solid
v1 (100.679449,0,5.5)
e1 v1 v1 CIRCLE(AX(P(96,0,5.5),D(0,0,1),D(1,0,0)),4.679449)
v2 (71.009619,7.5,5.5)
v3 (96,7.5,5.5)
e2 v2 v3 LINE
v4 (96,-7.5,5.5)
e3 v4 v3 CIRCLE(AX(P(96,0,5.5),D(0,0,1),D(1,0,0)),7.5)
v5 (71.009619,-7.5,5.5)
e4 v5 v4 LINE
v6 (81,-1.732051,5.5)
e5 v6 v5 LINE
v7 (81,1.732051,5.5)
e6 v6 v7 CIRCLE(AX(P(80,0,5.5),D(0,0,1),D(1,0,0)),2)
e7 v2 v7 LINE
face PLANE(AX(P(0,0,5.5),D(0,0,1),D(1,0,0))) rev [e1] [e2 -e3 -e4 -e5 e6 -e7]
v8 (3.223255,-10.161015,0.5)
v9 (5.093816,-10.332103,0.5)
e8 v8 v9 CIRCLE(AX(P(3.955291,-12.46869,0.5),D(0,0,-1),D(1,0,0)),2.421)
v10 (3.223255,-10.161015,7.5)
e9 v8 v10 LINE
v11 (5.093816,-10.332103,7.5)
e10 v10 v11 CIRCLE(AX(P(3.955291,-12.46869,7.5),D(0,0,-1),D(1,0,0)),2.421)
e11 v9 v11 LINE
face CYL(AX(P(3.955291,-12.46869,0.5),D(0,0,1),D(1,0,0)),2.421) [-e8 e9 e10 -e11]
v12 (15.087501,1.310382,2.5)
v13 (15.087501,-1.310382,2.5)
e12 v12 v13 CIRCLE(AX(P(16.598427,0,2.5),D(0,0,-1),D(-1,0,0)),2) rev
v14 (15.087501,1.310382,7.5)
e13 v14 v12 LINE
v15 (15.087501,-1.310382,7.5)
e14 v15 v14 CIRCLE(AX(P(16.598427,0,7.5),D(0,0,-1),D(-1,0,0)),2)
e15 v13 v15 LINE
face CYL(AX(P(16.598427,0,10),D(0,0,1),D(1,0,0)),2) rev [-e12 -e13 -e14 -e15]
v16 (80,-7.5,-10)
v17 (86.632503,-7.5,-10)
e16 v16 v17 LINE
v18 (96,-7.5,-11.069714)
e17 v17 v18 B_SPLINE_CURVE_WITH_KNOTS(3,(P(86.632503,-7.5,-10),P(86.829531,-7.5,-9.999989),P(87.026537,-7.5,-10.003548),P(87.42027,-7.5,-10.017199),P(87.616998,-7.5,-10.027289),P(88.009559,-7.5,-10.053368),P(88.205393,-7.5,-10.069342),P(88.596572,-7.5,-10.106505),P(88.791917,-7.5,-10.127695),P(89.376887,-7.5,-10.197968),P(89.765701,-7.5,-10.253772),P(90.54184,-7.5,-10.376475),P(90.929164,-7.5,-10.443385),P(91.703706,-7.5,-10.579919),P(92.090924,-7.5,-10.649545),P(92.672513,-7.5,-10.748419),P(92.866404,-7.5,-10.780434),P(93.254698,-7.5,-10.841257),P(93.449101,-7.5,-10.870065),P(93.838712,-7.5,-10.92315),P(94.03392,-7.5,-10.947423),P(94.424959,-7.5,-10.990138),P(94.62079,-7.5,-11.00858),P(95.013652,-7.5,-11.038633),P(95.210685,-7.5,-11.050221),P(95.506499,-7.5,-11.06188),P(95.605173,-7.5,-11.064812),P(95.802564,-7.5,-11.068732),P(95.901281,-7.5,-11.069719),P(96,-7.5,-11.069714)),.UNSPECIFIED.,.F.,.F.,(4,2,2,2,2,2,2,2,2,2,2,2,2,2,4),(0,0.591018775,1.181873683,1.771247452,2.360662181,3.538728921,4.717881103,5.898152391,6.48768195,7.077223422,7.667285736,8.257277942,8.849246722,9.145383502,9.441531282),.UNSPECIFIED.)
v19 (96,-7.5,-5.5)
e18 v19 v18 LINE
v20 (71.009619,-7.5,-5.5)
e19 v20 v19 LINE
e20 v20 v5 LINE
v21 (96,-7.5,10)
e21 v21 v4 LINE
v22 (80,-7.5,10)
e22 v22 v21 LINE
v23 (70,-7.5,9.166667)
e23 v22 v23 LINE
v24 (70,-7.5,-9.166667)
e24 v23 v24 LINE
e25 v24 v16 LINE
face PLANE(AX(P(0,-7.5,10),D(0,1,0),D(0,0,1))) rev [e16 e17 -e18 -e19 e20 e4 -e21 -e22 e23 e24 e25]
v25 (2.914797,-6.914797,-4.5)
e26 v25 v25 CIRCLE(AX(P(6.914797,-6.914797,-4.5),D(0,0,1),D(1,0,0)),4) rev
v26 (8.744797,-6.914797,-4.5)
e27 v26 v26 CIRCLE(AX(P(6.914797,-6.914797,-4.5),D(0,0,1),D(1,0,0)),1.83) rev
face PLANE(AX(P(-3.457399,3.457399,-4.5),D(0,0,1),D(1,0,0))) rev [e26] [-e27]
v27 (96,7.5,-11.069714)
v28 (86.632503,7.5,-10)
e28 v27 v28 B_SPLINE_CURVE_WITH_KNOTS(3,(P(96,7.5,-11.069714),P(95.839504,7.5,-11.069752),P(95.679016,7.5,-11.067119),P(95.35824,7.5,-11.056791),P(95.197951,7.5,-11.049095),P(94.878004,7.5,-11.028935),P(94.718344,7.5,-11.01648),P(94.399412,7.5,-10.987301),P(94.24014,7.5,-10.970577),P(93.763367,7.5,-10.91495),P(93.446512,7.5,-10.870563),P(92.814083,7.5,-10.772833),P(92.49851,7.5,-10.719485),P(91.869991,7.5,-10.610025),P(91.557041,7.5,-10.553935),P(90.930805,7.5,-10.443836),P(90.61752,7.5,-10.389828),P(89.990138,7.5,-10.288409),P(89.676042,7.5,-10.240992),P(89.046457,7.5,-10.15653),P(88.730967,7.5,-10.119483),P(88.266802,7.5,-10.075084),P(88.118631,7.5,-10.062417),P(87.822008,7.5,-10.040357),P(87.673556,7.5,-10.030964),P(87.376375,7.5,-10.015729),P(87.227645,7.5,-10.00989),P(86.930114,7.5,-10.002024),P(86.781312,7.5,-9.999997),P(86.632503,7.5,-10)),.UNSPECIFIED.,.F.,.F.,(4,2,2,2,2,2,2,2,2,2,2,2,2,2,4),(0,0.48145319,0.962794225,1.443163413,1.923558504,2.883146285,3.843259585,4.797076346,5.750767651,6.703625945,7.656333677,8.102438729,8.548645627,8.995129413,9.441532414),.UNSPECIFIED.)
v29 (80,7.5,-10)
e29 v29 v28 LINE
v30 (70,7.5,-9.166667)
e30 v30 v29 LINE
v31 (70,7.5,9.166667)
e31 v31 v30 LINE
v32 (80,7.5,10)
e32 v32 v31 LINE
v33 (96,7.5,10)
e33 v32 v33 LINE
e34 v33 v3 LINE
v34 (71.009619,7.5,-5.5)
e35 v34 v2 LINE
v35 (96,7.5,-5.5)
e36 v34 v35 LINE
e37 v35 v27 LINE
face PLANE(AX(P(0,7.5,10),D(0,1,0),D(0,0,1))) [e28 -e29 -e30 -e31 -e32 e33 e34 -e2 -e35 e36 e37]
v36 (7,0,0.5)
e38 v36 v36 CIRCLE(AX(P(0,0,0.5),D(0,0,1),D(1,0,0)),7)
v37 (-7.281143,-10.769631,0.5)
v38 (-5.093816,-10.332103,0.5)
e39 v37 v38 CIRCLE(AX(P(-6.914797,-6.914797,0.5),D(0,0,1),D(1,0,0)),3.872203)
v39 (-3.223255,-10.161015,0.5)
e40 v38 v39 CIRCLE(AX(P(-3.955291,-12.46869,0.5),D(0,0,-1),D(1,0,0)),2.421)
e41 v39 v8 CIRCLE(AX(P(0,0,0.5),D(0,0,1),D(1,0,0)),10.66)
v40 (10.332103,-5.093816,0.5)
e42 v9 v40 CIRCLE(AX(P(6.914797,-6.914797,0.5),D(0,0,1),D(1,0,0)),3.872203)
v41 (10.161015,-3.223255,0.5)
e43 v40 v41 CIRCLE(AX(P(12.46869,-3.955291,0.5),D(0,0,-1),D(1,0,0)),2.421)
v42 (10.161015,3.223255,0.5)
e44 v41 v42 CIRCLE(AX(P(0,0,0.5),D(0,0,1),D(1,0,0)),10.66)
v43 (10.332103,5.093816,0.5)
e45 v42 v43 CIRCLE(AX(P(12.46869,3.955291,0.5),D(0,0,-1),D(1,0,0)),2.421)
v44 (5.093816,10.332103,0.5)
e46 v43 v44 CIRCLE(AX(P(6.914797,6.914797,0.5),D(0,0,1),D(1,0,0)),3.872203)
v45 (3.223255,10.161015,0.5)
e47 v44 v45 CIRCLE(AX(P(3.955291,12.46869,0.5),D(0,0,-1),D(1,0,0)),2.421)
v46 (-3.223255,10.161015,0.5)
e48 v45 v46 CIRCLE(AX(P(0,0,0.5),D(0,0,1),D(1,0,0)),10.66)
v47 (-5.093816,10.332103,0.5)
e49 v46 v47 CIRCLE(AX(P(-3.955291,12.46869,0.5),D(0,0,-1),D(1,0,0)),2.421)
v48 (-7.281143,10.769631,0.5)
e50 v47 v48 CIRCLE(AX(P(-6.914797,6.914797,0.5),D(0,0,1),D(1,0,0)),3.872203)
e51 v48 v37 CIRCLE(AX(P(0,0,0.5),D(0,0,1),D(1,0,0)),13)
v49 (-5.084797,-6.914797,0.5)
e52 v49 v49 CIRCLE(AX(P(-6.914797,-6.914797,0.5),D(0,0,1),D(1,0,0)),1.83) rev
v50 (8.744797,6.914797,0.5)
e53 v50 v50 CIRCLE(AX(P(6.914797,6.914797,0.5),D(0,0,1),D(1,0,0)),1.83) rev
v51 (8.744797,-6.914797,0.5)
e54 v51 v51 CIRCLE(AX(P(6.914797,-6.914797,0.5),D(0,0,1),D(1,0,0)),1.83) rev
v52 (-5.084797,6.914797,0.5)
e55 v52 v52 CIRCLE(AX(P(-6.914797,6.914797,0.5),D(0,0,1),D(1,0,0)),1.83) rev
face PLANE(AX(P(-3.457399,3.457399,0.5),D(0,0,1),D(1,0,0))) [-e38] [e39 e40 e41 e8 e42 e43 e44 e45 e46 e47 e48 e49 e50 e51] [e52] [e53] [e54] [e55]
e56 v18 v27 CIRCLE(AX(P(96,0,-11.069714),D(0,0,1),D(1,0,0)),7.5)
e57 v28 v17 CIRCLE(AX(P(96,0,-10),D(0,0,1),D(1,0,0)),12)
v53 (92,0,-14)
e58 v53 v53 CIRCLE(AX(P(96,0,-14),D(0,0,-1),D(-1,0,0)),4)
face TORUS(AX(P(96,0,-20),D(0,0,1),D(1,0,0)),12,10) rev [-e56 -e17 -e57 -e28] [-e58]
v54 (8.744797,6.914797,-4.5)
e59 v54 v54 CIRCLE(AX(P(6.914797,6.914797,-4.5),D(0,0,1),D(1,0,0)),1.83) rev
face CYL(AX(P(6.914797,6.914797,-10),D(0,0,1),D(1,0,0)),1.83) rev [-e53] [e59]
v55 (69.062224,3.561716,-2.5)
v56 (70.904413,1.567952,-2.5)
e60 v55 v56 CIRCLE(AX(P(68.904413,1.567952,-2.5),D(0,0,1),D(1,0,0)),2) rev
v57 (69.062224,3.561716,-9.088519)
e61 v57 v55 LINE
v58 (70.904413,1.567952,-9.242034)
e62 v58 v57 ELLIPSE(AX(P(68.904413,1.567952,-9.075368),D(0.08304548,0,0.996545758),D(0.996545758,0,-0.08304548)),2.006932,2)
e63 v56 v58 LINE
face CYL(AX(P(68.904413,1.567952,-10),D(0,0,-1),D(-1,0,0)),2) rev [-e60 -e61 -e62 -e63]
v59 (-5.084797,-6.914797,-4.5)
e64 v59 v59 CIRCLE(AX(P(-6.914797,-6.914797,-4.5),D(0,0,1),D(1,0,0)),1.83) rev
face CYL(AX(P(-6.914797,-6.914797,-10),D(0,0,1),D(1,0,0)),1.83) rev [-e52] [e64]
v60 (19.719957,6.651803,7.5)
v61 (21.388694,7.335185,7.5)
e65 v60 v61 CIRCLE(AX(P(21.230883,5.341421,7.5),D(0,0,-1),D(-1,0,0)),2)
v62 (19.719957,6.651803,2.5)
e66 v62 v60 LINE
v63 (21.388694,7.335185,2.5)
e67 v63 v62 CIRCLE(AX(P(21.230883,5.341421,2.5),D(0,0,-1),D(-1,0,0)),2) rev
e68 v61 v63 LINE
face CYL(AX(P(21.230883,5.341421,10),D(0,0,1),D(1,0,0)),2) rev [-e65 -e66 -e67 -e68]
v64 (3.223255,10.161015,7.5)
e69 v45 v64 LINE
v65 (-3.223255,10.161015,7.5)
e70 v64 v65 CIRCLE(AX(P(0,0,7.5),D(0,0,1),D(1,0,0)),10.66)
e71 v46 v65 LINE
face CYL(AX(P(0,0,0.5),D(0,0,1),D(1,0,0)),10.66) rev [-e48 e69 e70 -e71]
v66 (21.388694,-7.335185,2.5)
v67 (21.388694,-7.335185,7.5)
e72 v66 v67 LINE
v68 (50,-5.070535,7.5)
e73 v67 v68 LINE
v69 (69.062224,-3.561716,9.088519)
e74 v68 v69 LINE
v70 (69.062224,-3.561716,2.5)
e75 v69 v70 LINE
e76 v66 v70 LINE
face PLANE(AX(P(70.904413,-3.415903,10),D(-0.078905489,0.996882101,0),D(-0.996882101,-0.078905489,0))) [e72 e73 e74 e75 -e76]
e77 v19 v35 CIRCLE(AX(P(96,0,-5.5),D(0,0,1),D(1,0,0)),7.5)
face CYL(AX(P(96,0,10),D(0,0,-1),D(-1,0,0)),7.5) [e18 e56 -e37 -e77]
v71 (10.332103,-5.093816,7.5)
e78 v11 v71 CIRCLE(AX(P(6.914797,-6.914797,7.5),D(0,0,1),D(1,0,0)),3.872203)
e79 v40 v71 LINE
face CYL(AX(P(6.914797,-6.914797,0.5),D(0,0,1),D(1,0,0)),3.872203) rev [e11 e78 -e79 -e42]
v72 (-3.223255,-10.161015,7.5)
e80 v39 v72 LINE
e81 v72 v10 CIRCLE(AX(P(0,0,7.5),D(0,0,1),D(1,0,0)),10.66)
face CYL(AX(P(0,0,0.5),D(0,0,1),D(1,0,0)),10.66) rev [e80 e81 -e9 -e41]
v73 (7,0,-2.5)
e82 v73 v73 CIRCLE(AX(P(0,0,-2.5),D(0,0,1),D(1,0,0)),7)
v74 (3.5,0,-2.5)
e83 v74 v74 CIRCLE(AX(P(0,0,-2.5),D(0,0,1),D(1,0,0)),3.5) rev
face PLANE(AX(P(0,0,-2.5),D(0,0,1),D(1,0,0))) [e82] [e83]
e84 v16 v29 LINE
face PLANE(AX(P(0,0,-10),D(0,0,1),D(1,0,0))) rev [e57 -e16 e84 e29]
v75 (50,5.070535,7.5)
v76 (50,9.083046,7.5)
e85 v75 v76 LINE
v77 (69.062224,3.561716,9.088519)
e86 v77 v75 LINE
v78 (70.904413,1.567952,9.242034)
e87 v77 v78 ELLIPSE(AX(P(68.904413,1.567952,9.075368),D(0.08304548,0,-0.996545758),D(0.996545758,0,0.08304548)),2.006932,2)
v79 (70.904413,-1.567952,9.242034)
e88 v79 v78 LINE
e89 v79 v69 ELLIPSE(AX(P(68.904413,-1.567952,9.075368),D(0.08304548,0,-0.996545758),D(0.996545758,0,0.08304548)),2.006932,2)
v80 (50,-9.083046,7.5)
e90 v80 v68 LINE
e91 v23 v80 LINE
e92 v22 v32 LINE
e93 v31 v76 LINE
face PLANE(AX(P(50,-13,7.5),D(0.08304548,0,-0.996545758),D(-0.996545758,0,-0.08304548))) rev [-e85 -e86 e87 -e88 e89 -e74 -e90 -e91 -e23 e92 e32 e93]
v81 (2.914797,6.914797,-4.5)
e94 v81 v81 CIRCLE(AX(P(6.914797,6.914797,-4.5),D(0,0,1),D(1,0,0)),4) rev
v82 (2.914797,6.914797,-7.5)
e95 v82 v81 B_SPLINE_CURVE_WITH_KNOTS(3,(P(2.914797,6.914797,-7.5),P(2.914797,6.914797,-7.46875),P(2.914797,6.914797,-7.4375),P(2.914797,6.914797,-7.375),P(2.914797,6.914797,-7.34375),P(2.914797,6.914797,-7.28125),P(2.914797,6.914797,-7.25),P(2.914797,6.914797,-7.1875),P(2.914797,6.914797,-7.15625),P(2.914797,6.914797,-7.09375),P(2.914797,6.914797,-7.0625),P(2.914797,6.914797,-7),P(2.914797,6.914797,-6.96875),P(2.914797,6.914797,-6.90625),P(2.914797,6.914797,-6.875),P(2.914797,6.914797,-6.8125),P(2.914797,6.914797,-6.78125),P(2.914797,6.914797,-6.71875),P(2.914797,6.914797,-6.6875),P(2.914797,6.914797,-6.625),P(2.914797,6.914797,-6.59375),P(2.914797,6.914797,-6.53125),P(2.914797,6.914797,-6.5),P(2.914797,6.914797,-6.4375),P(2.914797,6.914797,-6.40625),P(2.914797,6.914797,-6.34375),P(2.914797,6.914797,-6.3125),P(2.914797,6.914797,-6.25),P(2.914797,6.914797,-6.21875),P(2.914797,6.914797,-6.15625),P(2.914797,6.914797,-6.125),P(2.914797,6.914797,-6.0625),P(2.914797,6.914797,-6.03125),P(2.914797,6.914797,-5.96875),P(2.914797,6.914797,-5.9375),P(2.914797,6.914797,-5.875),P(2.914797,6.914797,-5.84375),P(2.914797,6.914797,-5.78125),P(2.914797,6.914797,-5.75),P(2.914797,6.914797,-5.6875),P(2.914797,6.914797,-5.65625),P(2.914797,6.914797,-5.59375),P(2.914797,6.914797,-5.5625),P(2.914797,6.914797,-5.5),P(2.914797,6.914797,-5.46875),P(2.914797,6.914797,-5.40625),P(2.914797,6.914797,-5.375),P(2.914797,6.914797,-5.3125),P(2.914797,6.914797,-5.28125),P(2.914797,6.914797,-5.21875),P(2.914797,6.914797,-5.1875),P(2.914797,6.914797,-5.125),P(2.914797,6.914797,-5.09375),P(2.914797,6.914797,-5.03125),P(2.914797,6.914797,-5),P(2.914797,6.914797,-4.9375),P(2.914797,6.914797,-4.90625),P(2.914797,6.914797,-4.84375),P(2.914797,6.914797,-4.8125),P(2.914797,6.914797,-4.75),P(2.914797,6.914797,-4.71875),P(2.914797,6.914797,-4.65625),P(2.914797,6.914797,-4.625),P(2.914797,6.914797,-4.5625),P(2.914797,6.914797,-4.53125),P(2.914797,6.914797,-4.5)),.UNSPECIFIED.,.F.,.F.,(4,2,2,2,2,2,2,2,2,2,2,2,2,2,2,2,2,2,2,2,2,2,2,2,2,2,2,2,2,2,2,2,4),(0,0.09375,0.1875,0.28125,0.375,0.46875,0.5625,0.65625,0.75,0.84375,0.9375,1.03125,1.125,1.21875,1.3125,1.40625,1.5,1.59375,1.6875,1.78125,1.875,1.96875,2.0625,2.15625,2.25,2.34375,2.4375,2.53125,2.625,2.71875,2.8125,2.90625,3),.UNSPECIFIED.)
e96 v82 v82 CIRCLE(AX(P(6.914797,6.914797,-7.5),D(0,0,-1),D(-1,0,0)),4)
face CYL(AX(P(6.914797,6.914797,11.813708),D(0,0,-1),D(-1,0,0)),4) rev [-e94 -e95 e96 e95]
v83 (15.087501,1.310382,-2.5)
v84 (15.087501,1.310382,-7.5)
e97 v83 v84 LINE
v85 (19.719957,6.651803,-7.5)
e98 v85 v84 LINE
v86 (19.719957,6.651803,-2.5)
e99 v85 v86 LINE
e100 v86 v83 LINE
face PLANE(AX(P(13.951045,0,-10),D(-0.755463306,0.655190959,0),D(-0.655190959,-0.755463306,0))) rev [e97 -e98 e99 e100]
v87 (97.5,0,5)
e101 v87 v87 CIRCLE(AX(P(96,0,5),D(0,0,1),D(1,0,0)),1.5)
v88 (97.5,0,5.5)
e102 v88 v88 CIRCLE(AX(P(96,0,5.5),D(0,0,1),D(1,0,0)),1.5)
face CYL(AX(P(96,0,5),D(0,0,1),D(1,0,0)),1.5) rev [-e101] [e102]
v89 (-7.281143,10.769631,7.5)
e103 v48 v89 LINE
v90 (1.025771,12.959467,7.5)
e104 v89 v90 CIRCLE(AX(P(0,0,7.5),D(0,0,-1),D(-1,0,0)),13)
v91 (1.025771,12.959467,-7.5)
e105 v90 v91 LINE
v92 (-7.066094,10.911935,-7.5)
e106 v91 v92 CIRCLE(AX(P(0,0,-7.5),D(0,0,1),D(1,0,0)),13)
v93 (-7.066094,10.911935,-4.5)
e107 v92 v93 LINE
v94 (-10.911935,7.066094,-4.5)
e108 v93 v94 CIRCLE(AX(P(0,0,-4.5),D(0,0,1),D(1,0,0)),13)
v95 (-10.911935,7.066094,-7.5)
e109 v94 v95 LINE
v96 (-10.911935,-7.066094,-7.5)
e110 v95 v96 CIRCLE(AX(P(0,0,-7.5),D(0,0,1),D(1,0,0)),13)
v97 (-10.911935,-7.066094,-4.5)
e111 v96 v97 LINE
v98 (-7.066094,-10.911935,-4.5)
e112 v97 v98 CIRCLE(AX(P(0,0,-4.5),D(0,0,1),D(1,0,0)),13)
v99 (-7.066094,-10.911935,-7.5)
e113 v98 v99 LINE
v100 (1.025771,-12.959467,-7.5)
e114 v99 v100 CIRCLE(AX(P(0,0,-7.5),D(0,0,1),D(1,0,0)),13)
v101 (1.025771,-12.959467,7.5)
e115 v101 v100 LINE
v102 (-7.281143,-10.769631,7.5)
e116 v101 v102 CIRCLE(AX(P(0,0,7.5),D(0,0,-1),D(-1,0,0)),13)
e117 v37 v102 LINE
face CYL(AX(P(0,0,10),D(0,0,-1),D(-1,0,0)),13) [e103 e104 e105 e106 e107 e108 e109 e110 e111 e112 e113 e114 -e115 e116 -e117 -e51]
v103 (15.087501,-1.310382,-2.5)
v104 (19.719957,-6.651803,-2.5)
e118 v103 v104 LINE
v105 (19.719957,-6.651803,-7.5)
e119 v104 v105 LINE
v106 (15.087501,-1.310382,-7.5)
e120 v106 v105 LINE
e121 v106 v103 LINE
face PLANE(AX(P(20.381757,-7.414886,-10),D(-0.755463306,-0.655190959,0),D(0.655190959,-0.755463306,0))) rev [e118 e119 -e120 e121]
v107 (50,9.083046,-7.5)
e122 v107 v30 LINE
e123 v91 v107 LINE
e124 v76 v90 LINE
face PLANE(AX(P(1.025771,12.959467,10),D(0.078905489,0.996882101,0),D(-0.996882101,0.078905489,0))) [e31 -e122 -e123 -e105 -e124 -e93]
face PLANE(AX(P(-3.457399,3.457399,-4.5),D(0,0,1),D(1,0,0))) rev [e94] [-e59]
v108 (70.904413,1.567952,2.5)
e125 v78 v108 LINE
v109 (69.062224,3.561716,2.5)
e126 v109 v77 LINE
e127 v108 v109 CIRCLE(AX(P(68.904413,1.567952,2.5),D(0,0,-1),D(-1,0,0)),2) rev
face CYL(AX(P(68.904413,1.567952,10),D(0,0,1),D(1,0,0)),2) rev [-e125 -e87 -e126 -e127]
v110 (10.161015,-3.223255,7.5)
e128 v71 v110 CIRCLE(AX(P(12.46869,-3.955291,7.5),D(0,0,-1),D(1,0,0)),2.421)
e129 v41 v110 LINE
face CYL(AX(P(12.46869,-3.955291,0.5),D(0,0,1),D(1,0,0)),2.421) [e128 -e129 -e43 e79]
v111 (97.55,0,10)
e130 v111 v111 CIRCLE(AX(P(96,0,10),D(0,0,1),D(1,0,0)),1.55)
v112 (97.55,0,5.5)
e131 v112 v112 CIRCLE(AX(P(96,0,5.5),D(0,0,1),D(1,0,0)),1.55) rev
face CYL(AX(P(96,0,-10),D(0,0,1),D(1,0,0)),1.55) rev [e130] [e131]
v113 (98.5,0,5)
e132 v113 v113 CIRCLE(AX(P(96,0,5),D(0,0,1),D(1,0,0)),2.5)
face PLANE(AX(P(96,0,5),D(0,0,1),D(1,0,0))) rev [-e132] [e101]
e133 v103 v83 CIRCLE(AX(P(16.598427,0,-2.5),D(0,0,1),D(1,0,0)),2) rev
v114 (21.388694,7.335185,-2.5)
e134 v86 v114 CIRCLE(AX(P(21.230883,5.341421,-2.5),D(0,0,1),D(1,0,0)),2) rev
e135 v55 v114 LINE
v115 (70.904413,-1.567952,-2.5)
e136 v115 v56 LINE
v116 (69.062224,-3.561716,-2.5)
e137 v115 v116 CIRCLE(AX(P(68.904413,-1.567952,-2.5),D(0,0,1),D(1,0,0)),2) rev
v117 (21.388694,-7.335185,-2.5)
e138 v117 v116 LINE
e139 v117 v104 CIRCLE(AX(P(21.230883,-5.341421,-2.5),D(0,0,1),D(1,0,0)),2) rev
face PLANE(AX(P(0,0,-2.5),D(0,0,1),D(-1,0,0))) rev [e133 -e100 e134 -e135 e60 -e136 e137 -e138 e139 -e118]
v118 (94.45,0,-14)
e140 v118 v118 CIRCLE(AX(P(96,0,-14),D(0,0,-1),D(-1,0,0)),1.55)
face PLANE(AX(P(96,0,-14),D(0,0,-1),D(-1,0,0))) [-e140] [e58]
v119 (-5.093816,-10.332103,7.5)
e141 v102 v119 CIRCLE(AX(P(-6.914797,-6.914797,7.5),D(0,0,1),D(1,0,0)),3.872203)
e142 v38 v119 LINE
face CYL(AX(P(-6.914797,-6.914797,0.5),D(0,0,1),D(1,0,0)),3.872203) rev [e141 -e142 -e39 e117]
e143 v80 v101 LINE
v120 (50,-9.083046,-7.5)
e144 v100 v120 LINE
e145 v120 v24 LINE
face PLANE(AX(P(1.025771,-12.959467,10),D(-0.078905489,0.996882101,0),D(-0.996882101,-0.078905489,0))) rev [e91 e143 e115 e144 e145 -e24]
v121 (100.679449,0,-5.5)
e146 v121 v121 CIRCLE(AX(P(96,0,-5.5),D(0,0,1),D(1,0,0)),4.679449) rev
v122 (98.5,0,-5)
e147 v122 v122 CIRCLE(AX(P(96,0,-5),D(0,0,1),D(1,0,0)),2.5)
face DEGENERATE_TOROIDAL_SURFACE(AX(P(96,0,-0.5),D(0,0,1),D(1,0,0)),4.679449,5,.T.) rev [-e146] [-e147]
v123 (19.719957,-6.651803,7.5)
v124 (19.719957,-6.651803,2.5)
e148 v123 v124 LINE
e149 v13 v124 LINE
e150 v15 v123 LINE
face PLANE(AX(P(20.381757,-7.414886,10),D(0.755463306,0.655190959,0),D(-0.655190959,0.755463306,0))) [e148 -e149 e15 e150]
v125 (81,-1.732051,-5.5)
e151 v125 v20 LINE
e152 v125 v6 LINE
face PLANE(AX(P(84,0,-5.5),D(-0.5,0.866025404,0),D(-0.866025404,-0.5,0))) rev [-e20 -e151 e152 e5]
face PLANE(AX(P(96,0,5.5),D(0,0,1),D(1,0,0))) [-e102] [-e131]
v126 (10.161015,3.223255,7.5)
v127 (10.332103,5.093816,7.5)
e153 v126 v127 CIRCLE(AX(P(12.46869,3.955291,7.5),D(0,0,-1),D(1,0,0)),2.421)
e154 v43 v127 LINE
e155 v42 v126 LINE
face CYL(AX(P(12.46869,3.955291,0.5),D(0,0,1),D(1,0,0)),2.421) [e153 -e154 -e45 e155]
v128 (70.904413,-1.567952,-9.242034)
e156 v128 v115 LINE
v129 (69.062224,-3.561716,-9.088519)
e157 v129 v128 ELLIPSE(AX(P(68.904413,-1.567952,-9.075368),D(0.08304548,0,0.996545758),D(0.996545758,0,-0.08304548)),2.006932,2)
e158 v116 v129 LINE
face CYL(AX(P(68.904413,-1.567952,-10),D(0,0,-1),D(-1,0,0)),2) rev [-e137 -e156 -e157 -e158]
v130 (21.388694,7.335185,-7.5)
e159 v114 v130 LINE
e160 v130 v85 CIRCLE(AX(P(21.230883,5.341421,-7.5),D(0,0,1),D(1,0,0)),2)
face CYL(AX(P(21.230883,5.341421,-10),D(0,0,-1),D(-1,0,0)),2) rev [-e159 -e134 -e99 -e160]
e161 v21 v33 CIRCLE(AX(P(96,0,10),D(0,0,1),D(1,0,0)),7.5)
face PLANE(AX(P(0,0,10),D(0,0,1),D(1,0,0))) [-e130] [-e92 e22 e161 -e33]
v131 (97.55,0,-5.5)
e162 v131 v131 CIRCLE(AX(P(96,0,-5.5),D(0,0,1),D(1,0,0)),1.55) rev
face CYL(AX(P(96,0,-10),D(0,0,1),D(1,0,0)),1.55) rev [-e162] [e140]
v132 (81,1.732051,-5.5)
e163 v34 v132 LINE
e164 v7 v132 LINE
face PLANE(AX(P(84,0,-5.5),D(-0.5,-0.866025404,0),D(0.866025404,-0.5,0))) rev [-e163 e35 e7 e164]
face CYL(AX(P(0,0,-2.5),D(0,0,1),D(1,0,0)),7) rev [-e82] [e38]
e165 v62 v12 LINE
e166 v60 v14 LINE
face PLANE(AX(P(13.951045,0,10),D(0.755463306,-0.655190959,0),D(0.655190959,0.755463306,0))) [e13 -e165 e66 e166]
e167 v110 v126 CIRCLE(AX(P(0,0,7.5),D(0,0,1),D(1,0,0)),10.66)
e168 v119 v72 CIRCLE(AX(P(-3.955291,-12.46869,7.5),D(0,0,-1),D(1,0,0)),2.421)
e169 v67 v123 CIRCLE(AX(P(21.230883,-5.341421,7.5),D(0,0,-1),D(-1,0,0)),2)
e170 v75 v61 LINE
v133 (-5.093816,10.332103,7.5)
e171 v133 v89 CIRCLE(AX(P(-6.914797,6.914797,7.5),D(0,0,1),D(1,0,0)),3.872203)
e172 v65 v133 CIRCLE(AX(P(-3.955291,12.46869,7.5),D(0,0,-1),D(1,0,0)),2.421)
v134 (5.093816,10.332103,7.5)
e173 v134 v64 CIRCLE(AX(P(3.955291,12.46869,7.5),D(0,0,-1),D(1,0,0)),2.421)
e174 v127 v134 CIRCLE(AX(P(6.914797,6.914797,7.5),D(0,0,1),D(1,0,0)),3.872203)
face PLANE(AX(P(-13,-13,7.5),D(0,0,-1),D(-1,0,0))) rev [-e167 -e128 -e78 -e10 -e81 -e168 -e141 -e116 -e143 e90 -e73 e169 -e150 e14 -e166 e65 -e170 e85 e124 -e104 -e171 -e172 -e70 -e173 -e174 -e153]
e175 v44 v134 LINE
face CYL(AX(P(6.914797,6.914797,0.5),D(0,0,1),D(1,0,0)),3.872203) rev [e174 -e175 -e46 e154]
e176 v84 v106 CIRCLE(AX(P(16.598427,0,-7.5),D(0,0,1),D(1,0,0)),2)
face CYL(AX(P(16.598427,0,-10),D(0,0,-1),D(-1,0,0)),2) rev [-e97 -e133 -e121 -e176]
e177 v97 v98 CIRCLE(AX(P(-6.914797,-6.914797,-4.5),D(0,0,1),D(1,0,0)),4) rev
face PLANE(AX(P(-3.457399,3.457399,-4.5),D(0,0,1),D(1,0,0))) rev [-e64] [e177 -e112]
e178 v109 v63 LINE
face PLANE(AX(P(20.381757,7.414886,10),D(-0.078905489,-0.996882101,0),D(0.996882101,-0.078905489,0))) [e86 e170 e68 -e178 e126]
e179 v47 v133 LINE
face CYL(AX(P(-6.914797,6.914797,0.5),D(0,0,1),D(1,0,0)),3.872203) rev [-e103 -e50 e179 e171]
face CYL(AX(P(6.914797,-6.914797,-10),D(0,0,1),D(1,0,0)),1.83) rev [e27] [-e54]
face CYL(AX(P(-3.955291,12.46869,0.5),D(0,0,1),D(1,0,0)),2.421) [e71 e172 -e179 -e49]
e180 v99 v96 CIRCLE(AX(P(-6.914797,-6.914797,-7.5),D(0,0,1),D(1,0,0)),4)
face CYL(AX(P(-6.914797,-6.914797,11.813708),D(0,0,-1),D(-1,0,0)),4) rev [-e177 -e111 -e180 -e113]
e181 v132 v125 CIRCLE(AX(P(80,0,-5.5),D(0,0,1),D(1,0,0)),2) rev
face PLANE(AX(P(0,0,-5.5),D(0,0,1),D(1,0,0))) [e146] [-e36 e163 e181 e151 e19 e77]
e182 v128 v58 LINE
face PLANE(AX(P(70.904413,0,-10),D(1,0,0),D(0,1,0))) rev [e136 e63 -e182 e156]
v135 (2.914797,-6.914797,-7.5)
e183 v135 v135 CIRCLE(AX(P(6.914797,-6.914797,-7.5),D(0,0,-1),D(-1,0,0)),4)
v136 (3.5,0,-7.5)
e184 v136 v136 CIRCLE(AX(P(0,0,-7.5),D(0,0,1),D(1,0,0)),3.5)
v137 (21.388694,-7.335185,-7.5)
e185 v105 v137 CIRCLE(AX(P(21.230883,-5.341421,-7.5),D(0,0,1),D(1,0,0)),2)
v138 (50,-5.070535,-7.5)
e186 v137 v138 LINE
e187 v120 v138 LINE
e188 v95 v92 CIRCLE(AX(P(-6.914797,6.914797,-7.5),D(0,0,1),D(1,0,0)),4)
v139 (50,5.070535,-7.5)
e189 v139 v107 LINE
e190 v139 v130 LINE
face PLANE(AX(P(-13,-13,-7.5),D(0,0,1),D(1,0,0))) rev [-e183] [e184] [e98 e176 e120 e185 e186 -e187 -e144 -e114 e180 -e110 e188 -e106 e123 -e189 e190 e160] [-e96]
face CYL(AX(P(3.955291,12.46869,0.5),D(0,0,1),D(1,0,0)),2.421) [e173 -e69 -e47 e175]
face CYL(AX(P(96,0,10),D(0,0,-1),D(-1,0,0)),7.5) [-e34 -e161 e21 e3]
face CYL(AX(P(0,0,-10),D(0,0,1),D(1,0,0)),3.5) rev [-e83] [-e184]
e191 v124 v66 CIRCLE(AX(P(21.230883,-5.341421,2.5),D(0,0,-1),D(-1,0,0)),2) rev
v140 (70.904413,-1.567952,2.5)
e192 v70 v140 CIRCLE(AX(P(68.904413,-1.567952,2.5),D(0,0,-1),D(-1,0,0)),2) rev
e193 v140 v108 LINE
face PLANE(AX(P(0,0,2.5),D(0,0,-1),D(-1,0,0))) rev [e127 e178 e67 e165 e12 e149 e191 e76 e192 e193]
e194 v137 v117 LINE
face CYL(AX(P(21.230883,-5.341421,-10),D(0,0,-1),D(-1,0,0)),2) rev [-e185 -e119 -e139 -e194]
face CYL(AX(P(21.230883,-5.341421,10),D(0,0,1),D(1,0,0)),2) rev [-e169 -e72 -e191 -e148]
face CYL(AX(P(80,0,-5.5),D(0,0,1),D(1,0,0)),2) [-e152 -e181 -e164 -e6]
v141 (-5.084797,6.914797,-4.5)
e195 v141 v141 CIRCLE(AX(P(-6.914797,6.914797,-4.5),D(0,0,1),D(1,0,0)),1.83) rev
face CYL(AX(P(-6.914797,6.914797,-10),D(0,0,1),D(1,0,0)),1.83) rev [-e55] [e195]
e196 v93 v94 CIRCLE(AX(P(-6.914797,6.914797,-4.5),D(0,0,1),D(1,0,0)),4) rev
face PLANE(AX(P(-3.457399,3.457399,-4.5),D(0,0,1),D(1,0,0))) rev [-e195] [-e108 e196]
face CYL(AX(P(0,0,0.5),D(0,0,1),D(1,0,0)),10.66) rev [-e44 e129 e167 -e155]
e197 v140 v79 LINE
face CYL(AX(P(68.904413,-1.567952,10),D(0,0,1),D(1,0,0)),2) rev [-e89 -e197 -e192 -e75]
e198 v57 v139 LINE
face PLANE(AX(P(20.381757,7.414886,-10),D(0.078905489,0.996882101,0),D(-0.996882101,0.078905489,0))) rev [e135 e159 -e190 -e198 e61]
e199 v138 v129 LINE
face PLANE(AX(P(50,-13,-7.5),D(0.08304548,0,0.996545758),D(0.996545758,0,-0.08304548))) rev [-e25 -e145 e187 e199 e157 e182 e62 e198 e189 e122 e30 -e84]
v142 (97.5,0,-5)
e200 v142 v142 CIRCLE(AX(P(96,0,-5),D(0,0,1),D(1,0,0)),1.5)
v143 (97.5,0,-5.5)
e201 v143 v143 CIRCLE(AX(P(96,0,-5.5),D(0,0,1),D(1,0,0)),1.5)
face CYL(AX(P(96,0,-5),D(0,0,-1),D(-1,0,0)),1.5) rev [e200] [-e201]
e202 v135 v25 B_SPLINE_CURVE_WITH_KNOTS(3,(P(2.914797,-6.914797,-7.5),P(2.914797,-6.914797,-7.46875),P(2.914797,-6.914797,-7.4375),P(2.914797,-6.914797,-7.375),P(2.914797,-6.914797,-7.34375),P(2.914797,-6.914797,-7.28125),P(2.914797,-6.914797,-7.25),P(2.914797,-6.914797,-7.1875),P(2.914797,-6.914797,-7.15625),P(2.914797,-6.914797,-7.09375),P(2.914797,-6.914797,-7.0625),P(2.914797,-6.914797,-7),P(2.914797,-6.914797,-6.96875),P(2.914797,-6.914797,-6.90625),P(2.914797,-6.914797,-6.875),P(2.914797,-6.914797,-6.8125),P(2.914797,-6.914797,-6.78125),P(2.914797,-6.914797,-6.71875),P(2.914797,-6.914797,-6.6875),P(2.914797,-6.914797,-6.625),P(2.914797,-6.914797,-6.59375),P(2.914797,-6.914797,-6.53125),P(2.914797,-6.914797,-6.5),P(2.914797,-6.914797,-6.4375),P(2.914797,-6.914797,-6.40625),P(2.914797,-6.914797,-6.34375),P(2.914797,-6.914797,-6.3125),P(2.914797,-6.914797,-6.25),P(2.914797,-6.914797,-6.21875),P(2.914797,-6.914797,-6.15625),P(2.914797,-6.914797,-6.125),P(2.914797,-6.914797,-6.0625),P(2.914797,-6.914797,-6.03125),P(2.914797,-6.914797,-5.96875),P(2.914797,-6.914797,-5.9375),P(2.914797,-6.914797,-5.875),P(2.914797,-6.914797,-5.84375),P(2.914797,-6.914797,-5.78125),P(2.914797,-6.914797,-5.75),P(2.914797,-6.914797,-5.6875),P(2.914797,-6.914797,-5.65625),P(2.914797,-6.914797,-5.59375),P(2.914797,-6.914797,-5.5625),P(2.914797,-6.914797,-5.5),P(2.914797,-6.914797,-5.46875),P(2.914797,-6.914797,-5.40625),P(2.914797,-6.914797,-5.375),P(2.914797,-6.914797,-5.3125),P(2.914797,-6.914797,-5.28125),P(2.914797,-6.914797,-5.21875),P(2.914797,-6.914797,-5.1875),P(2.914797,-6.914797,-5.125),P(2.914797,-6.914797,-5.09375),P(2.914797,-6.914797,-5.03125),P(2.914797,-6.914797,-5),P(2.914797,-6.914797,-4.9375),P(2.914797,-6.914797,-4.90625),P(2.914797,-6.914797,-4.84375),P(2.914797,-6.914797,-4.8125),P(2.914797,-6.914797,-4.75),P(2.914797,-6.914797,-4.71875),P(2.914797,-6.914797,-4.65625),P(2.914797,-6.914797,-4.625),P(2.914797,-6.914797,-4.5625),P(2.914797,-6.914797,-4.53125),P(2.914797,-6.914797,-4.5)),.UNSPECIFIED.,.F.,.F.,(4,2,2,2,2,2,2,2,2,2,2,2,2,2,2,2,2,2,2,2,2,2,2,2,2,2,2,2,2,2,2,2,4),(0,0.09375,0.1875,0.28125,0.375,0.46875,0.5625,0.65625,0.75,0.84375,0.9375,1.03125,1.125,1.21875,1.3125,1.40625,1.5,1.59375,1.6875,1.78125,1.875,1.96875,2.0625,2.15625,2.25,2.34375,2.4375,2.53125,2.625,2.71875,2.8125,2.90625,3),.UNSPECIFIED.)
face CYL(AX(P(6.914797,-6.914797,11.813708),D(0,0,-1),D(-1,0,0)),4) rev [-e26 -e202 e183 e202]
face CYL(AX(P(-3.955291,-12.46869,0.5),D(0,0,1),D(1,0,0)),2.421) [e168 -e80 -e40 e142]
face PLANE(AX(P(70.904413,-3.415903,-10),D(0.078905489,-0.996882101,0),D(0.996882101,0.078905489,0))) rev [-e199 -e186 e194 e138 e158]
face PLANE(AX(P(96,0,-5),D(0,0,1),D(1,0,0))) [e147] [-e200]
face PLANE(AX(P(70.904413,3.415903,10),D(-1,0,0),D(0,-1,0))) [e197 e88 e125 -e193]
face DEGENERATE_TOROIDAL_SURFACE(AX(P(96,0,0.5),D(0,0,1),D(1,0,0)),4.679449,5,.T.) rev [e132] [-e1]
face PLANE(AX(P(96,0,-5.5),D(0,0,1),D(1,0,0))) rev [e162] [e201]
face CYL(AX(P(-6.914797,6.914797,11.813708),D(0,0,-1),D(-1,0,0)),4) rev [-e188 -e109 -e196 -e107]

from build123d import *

# Parameters (mm, degrees)
SKETCH2_R               = 13
SKETCH2_R_2             = 7.5
BOSS_EXTRUDE2_DEPTH     = 10
CUT_EXTRUDE1_DEPTH      = 105.791459576
CUT_EXTRUDE1_DEPTH_BACK = 105.791459576
SKETCH5_R               = 1.83
SKETCH5_R_2             = 3.5
CUT_EXTRUDE2_DEPTH      = 106.770979007
HUB_CUTOUT_DEPTH        = 7
SKETCH8_R               = 7
CUT_EXTRUDE4_DEPTH      = 3
CUT_EXTRUDE5_DEPTH      = 105.791459576
CUT_EXTRUDE5_DEPTH_BACK = 105.791459576
SKETCH9_R               = 1.55
CUT_EXTRUDE6_DEPTH      = 5.5
FILLET1_R               = 2
CUT_EXTRUDE7_START      = 2.5
CUT_EXTRUDE7_DEPTH      = 103.291459576
FILLET2_R               = 2
FILLET2_OF_MIRROR1_R    = 2
SKETCH12_R              = 4
SKETCH12_R_2            = 1.55
BOSS_EXTRUDE3_DEPTH     = 4
FILLET3_START           = -14
FILLET3_2_DEPTH         = 4
BOSS_EXTRUDE4_START     = 5.5
SKETCH13_R              = 2.5
SKETCH13_R_2            = 1.5
BOSS_EXTRUDE4_DEPTH     = 0.5
BOSS_EXTRUDE5_START     = -5
SKETCH13_2_R            = 2.5
SKETCH13_2_R_2          = 1.5
BOSS_EXTRUDE5_DEPTH     = 0.5
FILLET4_R               = 5
SKETCH15_R              = 4
CUT_EXTRUDE8_DEPTH      = 3


with BuildPart() as part:
    # Sketch2 → Boss-Extrude2 (new, symmetric)
    with BuildSketch(Plane.XY):
        Circle(SKETCH2_R)
        with BuildLine():
            Line((70, 7.5), (1.025771359, 12.959467316))
            ThreePointArc((1.025771359, 12.959467316), (9.548168088, 8.822272166), (13, 0))
            ThreePointArc((13, 0), (9.548168088, -8.822272166), (1.025771359, -12.959467316))
            Line((1.025771359, -12.959467316), (70, -7.5))
            Line((70, -7.5), (70, 7.5))
        make_face()
        with BuildLine():
            Line((96, 7.5), (70, 7.5))
            Line((70, 7.5), (70, -7.5))
            Line((70, -7.5), (96, -7.5))
            ThreePointArc((96, -7.5), (88.5, 0), (96, 7.5))
        make_face()
        with Locations((96, 0)):
            Circle(SKETCH2_R_2)
        Circle(SKETCH2_R)
    extrude(amount=BOSS_EXTRUDE2_DEPTH, both=True)

    # Sketch4 → Cut-Extrude1 (cut, two sides: drawn at the far end of the back side and taken through both)
    with BuildSketch(Plane(origin=(0, 0, 0), x_dir=(1, 0, 0), z_dir=(0, 1, 0)).offset(-CUT_EXTRUDE1_DEPTH_BACK)):
        Polygon((-13, 7.5), (50, 7.5), (80, 10), (-13, 10), align=None)
        Polygon((-13, -7.5), (50, -7.5), (80, -10), (-13, -10), align=None)
    extrude(amount=CUT_EXTRUDE1_DEPTH + CUT_EXTRUDE1_DEPTH_BACK, mode=Mode.SUBTRACT)

    # Sketch5 → Cut-Extrude2 (cut, through all)
    with BuildSketch(Plane.XY.offset(7.5)):
        with Locations((-6.914797213, 6.914797213)):
            Circle(SKETCH5_R)
        with Locations((6.914797213, 6.914797213)):
            Circle(SKETCH5_R)
        with Locations((6.914797213, -6.914797213)):
            Circle(SKETCH5_R)
        with Locations((-6.914797213, -6.914797213)):
            Circle(SKETCH5_R)
        Circle(SKETCH5_R_2)
    extrude(amount=-CUT_EXTRUDE2_DEPTH, mode=Mode.SUBTRACT)

    # Sketch7 → hub cutout (cut)
    with BuildSketch(Plane.XY.offset(7.5)):
        with BuildLine():
            ThreePointArc((-7.281143007, 10.769631215), (-13, 0), (-7.281143007, -10.769631215))
            ThreePointArc((-7.281143007, -10.769631215), (-6.15529138, -10.711783559), (-5.093815501, -10.332103173))
            ThreePointArc((-5.093815501, -10.332103173), (-4.17580433, -10.057753531), (-3.223255475, -10.161014917))
            ThreePointArc((-3.223255475, -10.161014917), (0, -10.66), (3.223255475, -10.161014917))
            ThreePointArc((3.223255475, -10.161014917), (4.17580433, -10.057753531), (5.093815501, -10.332103173))
            ThreePointArc((5.093815501, -10.332103173), (9.652858062, -9.652858062), (10.332103173, -5.093815501))
            ThreePointArc((10.332103173, -5.093815501), (10.057753531, -4.17580433), (10.161014917, -3.223255475))
            ThreePointArc((10.161014917, -3.223255475), (10.66, 0), (10.161014917, 3.223255475))
            ThreePointArc((10.161014917, 3.223255475), (10.057753531, 4.17580433), (10.332103173, 5.093815501))
            ThreePointArc((10.332103173, 5.093815501), (9.652858062, 9.652858062), (5.093815501, 10.332103173))
            ThreePointArc((5.093815501, 10.332103173), (4.17580433, 10.057753531), (3.223255475, 10.161014917))
            ThreePointArc((3.223255475, 10.161014917), (0, 10.66), (-3.223255475, 10.161014917))
            ThreePointArc((-3.223255475, 10.161014917), (-4.17580433, 10.057753531), (-5.093815501, 10.332103173))
            ThreePointArc((-5.093815501, 10.332103173), (-6.15529138, 10.711783559), (-7.281143007, 10.769631215))
        make_face()
    extrude(amount=-HUB_CUTOUT_DEPTH, mode=Mode.SUBTRACT)

    # Sketch8 → Cut-Extrude4 (cut)
    with BuildSketch(Plane.XY.offset(0.5)):
        Circle(SKETCH8_R)
    extrude(amount=-CUT_EXTRUDE4_DEPTH, mode=Mode.SUBTRACT)

    # Sketch9 → Cut-Extrude5 (cut, two sides: drawn at the far end of the back side and taken through both)
    with BuildSketch(Plane.XY.offset(-CUT_EXTRUDE5_DEPTH_BACK)):
        with Locations((96, 0)):
            Circle(SKETCH9_R)
    extrude(amount=CUT_EXTRUDE5_DEPTH + CUT_EXTRUDE5_DEPTH_BACK, mode=Mode.SUBTRACT)

    # Sketch10 → Cut-Extrude6 (cut, symmetric)
    with BuildSketch(Plane.XY):
        Polygon((84, 0), (62.184725581, 12.595054558), (110.068063566, 12.595054558), (110.068063566, -12.520209035), (62.31436183, -12.520209035), align=None)
    extrude(amount=CUT_EXTRUDE6_DEPTH, both=True, mode=Mode.SUBTRACT)

    # Fillet1
    fillet1_edges = [part.edges().sort_by_distance(p)[0] for p in [
        (84, 0, 0),
    ]]
    fillet(fillet1_edges, radius=FILLET1_R)

    # Sketch11 → Cut-Extrude7 (cut, through all)
    with BuildSketch(Plane.XY.offset(CUT_EXTRUDE7_START)):
        Polygon((13.951045221, 0), (20.381756661, 7.414886386), (70.904413477, 3.415903011), (70.904413477, 0), (70.904413477, -3.415903011), (20.381756661, -7.414886386), align=None)
    cut_extrude7 = extrude(amount=CUT_EXTRUDE7_DEPTH, mode=Mode.SUBTRACT)

    # Fillet2
    fillet2_edges = [part.edges().sort_by_distance(p)[0] for p in [
        (13.951045221, 0, 5),
        (20.381756661, 7.414886386, 5),
        (20.381756661, -7.414886386, 5),
        (70.904413477, -3.415903011, 5.871017228),
        (70.904413477, 3.415903011, 5.871017228),
    ]]
    fillet(fillet2_edges, radius=FILLET2_R)

    # Mirror1: Cut-Extrude7 across plane
    add(cut_extrude7.mirror(Plane.XY), mode=Mode.SUBTRACT)

    # Fillet2 of Mirror1
    fillet2_of_mirror1_edges = [part.edges().sort_by_distance(p)[0] for p in [
        (13.951045221, 0, -5),
        (20.381756661, 7.414886386, -5),
        (20.381756661, -7.414886386, -5),
        (70.904413477, -3.415903011, -5.871017228),
        (70.904413477, 3.415903011, -5.871017228),
    ]]
    fillet(fillet2_of_mirror1_edges, radius=FILLET2_OF_MIRROR1_R)

    # Sketch12 → Boss-Extrude3 (add)
    with BuildSketch(Plane(origin=(0, 0, -10), x_dir=(-1, 0, 0), z_dir=(0, 0, -1))):
        with Locations(Location((-96, 0, 0), (0, 0, 180))):
            Circle(SKETCH12_R)
        with Locations(Location((-96, 0, 0), (0, 0, 180))):
            Circle(SKETCH12_R_2, mode=Mode.SUBTRACT)
    extrude(amount=BOSS_EXTRUDE3_DEPTH)

    # Fillet3: read off the stored shape, not the designer's step
    # Fillet3 outline → Fillet3 (revolve)
    with BuildSketch(Plane(origin=(96, 0, 0), x_dir=(1, 0, 0), z_dir=(0, -1, 0))):
        with BuildLine():
            ThreePointArc((4, -14), (7.527864045, -11.05572809), (12, -10))
            Line((12, -10), (4, -10))
            Line((4, -10), (4, -14))
        make_face()
    revolve(axis=Axis((96, 0, 0), (0, 0, 1)))

    # Fillet3 2 outline → Fillet3 2 (cut)
    with BuildSketch(Plane.XY.offset(FILLET3_START)):
        with BuildLine():
            ThreePointArc((96, 7.5), (103.5, 0), (96, -7.5))
            Line((96, -7.5), (85, -7.5))
            Line((85, -7.5), (85, -13))
            Line((85, -13), (109, -13))
            Line((109, -13), (109, 13))
            Line((109, 13), (85, 13))
            Line((85, 13), (85, 7.5))
            Line((85, 7.5), (96, 7.5))
        make_face()
    extrude(amount=FILLET3_2_DEPTH, mode=Mode.SUBTRACT)

    # Sketch13 → Boss-Extrude4 (add)
    with BuildSketch(Plane.XY.offset(BOSS_EXTRUDE4_START)):
        with Locations((96, 0)):
            Circle(SKETCH13_R)
        with Locations((96, 0)):
            Circle(SKETCH13_R_2, mode=Mode.SUBTRACT)
    extrude(amount=-BOSS_EXTRUDE4_DEPTH)

    # Sketch13<2> → Boss-Extrude5 (add)
    with BuildSketch(Plane.XY.offset(BOSS_EXTRUDE5_START)):
        with Locations((96, 0)):
            Circle(SKETCH13_2_R)
        with Locations((96, 0)):
            Circle(SKETCH13_2_R_2, mode=Mode.SUBTRACT)
    extrude(amount=-BOSS_EXTRUDE5_DEPTH)

    # Fillet4
    # the kernel refuses this fillet: 5 mm, written as the material it adds along each edge
    with BuildSketch(Plane(origin=(96, 0, 5.5), x_dir=(1, 0, 0), z_dir=(0, -1, 0))) as fillet4_piece_1:
        with BuildLine():
            CenterArc((4.679449472, -5), FILLET4_R, 90, 25.841932763)
            Line((2.5, -0.5), (2.456411011, -0.41))
            ThreePointArc((2.456411011, -0.41), (2.4, -0.25), (2.4, 0))
            Line((2.4, 0), (2.5, 0.1))
            Line((2.5, 0.1), (4.679449472, 0.1))
            Line((4.679449472, 0.1), (4.679449472, 0))
        make_face()
    revolve(axis=Axis((96, 0, 5.5), (0, 0, 1)))
    with BuildSketch(Plane(origin=(96, 0, -5.5), x_dir=(1, 0, 0), z_dir=(0, -1, 0))) as fillet4_piece_2:
        with BuildLine():
            CenterArc((4.679449472, 5), FILLET4_R, 244.158067237, 25.841932763)
            Line((2.5, 0.5), (2.456411011, 0.41))
            ThreePointArc((2.456411011, 0.41), (2.4, 0.25), (2.4, 0))
            Line((2.4, 0), (2.5, -0.1))
            Line((2.5, -0.1), (4.679449472, -0.1))
            Line((4.679449472, -0.1), (4.679449472, 0))
        make_face()
    revolve(axis=Axis((96, 0, -5.5), (0, 0, 1)))

    # Sketch15 → Cut-Extrude8 (cut)
    with BuildSketch(Plane(origin=(0, 0, -7.5), x_dir=(-1, 0, 0), z_dir=(0, 0, -1))):
        with Locations((6.914797213, -6.914797213)):
            Circle(SKETCH15_R)
        with Locations((-6.914797213, -6.914797213)):
            Circle(SKETCH15_R)
        with Locations((6.914797213, 6.914797213)):
            Circle(SKETCH15_R)
        with Locations((-6.914797213, 6.914797213)):
            Circle(SKETCH15_R)
    extrude(amount=-CUT_EXTRUDE8_DEPTH, mode=Mode.SUBTRACT)


solid = part.part
